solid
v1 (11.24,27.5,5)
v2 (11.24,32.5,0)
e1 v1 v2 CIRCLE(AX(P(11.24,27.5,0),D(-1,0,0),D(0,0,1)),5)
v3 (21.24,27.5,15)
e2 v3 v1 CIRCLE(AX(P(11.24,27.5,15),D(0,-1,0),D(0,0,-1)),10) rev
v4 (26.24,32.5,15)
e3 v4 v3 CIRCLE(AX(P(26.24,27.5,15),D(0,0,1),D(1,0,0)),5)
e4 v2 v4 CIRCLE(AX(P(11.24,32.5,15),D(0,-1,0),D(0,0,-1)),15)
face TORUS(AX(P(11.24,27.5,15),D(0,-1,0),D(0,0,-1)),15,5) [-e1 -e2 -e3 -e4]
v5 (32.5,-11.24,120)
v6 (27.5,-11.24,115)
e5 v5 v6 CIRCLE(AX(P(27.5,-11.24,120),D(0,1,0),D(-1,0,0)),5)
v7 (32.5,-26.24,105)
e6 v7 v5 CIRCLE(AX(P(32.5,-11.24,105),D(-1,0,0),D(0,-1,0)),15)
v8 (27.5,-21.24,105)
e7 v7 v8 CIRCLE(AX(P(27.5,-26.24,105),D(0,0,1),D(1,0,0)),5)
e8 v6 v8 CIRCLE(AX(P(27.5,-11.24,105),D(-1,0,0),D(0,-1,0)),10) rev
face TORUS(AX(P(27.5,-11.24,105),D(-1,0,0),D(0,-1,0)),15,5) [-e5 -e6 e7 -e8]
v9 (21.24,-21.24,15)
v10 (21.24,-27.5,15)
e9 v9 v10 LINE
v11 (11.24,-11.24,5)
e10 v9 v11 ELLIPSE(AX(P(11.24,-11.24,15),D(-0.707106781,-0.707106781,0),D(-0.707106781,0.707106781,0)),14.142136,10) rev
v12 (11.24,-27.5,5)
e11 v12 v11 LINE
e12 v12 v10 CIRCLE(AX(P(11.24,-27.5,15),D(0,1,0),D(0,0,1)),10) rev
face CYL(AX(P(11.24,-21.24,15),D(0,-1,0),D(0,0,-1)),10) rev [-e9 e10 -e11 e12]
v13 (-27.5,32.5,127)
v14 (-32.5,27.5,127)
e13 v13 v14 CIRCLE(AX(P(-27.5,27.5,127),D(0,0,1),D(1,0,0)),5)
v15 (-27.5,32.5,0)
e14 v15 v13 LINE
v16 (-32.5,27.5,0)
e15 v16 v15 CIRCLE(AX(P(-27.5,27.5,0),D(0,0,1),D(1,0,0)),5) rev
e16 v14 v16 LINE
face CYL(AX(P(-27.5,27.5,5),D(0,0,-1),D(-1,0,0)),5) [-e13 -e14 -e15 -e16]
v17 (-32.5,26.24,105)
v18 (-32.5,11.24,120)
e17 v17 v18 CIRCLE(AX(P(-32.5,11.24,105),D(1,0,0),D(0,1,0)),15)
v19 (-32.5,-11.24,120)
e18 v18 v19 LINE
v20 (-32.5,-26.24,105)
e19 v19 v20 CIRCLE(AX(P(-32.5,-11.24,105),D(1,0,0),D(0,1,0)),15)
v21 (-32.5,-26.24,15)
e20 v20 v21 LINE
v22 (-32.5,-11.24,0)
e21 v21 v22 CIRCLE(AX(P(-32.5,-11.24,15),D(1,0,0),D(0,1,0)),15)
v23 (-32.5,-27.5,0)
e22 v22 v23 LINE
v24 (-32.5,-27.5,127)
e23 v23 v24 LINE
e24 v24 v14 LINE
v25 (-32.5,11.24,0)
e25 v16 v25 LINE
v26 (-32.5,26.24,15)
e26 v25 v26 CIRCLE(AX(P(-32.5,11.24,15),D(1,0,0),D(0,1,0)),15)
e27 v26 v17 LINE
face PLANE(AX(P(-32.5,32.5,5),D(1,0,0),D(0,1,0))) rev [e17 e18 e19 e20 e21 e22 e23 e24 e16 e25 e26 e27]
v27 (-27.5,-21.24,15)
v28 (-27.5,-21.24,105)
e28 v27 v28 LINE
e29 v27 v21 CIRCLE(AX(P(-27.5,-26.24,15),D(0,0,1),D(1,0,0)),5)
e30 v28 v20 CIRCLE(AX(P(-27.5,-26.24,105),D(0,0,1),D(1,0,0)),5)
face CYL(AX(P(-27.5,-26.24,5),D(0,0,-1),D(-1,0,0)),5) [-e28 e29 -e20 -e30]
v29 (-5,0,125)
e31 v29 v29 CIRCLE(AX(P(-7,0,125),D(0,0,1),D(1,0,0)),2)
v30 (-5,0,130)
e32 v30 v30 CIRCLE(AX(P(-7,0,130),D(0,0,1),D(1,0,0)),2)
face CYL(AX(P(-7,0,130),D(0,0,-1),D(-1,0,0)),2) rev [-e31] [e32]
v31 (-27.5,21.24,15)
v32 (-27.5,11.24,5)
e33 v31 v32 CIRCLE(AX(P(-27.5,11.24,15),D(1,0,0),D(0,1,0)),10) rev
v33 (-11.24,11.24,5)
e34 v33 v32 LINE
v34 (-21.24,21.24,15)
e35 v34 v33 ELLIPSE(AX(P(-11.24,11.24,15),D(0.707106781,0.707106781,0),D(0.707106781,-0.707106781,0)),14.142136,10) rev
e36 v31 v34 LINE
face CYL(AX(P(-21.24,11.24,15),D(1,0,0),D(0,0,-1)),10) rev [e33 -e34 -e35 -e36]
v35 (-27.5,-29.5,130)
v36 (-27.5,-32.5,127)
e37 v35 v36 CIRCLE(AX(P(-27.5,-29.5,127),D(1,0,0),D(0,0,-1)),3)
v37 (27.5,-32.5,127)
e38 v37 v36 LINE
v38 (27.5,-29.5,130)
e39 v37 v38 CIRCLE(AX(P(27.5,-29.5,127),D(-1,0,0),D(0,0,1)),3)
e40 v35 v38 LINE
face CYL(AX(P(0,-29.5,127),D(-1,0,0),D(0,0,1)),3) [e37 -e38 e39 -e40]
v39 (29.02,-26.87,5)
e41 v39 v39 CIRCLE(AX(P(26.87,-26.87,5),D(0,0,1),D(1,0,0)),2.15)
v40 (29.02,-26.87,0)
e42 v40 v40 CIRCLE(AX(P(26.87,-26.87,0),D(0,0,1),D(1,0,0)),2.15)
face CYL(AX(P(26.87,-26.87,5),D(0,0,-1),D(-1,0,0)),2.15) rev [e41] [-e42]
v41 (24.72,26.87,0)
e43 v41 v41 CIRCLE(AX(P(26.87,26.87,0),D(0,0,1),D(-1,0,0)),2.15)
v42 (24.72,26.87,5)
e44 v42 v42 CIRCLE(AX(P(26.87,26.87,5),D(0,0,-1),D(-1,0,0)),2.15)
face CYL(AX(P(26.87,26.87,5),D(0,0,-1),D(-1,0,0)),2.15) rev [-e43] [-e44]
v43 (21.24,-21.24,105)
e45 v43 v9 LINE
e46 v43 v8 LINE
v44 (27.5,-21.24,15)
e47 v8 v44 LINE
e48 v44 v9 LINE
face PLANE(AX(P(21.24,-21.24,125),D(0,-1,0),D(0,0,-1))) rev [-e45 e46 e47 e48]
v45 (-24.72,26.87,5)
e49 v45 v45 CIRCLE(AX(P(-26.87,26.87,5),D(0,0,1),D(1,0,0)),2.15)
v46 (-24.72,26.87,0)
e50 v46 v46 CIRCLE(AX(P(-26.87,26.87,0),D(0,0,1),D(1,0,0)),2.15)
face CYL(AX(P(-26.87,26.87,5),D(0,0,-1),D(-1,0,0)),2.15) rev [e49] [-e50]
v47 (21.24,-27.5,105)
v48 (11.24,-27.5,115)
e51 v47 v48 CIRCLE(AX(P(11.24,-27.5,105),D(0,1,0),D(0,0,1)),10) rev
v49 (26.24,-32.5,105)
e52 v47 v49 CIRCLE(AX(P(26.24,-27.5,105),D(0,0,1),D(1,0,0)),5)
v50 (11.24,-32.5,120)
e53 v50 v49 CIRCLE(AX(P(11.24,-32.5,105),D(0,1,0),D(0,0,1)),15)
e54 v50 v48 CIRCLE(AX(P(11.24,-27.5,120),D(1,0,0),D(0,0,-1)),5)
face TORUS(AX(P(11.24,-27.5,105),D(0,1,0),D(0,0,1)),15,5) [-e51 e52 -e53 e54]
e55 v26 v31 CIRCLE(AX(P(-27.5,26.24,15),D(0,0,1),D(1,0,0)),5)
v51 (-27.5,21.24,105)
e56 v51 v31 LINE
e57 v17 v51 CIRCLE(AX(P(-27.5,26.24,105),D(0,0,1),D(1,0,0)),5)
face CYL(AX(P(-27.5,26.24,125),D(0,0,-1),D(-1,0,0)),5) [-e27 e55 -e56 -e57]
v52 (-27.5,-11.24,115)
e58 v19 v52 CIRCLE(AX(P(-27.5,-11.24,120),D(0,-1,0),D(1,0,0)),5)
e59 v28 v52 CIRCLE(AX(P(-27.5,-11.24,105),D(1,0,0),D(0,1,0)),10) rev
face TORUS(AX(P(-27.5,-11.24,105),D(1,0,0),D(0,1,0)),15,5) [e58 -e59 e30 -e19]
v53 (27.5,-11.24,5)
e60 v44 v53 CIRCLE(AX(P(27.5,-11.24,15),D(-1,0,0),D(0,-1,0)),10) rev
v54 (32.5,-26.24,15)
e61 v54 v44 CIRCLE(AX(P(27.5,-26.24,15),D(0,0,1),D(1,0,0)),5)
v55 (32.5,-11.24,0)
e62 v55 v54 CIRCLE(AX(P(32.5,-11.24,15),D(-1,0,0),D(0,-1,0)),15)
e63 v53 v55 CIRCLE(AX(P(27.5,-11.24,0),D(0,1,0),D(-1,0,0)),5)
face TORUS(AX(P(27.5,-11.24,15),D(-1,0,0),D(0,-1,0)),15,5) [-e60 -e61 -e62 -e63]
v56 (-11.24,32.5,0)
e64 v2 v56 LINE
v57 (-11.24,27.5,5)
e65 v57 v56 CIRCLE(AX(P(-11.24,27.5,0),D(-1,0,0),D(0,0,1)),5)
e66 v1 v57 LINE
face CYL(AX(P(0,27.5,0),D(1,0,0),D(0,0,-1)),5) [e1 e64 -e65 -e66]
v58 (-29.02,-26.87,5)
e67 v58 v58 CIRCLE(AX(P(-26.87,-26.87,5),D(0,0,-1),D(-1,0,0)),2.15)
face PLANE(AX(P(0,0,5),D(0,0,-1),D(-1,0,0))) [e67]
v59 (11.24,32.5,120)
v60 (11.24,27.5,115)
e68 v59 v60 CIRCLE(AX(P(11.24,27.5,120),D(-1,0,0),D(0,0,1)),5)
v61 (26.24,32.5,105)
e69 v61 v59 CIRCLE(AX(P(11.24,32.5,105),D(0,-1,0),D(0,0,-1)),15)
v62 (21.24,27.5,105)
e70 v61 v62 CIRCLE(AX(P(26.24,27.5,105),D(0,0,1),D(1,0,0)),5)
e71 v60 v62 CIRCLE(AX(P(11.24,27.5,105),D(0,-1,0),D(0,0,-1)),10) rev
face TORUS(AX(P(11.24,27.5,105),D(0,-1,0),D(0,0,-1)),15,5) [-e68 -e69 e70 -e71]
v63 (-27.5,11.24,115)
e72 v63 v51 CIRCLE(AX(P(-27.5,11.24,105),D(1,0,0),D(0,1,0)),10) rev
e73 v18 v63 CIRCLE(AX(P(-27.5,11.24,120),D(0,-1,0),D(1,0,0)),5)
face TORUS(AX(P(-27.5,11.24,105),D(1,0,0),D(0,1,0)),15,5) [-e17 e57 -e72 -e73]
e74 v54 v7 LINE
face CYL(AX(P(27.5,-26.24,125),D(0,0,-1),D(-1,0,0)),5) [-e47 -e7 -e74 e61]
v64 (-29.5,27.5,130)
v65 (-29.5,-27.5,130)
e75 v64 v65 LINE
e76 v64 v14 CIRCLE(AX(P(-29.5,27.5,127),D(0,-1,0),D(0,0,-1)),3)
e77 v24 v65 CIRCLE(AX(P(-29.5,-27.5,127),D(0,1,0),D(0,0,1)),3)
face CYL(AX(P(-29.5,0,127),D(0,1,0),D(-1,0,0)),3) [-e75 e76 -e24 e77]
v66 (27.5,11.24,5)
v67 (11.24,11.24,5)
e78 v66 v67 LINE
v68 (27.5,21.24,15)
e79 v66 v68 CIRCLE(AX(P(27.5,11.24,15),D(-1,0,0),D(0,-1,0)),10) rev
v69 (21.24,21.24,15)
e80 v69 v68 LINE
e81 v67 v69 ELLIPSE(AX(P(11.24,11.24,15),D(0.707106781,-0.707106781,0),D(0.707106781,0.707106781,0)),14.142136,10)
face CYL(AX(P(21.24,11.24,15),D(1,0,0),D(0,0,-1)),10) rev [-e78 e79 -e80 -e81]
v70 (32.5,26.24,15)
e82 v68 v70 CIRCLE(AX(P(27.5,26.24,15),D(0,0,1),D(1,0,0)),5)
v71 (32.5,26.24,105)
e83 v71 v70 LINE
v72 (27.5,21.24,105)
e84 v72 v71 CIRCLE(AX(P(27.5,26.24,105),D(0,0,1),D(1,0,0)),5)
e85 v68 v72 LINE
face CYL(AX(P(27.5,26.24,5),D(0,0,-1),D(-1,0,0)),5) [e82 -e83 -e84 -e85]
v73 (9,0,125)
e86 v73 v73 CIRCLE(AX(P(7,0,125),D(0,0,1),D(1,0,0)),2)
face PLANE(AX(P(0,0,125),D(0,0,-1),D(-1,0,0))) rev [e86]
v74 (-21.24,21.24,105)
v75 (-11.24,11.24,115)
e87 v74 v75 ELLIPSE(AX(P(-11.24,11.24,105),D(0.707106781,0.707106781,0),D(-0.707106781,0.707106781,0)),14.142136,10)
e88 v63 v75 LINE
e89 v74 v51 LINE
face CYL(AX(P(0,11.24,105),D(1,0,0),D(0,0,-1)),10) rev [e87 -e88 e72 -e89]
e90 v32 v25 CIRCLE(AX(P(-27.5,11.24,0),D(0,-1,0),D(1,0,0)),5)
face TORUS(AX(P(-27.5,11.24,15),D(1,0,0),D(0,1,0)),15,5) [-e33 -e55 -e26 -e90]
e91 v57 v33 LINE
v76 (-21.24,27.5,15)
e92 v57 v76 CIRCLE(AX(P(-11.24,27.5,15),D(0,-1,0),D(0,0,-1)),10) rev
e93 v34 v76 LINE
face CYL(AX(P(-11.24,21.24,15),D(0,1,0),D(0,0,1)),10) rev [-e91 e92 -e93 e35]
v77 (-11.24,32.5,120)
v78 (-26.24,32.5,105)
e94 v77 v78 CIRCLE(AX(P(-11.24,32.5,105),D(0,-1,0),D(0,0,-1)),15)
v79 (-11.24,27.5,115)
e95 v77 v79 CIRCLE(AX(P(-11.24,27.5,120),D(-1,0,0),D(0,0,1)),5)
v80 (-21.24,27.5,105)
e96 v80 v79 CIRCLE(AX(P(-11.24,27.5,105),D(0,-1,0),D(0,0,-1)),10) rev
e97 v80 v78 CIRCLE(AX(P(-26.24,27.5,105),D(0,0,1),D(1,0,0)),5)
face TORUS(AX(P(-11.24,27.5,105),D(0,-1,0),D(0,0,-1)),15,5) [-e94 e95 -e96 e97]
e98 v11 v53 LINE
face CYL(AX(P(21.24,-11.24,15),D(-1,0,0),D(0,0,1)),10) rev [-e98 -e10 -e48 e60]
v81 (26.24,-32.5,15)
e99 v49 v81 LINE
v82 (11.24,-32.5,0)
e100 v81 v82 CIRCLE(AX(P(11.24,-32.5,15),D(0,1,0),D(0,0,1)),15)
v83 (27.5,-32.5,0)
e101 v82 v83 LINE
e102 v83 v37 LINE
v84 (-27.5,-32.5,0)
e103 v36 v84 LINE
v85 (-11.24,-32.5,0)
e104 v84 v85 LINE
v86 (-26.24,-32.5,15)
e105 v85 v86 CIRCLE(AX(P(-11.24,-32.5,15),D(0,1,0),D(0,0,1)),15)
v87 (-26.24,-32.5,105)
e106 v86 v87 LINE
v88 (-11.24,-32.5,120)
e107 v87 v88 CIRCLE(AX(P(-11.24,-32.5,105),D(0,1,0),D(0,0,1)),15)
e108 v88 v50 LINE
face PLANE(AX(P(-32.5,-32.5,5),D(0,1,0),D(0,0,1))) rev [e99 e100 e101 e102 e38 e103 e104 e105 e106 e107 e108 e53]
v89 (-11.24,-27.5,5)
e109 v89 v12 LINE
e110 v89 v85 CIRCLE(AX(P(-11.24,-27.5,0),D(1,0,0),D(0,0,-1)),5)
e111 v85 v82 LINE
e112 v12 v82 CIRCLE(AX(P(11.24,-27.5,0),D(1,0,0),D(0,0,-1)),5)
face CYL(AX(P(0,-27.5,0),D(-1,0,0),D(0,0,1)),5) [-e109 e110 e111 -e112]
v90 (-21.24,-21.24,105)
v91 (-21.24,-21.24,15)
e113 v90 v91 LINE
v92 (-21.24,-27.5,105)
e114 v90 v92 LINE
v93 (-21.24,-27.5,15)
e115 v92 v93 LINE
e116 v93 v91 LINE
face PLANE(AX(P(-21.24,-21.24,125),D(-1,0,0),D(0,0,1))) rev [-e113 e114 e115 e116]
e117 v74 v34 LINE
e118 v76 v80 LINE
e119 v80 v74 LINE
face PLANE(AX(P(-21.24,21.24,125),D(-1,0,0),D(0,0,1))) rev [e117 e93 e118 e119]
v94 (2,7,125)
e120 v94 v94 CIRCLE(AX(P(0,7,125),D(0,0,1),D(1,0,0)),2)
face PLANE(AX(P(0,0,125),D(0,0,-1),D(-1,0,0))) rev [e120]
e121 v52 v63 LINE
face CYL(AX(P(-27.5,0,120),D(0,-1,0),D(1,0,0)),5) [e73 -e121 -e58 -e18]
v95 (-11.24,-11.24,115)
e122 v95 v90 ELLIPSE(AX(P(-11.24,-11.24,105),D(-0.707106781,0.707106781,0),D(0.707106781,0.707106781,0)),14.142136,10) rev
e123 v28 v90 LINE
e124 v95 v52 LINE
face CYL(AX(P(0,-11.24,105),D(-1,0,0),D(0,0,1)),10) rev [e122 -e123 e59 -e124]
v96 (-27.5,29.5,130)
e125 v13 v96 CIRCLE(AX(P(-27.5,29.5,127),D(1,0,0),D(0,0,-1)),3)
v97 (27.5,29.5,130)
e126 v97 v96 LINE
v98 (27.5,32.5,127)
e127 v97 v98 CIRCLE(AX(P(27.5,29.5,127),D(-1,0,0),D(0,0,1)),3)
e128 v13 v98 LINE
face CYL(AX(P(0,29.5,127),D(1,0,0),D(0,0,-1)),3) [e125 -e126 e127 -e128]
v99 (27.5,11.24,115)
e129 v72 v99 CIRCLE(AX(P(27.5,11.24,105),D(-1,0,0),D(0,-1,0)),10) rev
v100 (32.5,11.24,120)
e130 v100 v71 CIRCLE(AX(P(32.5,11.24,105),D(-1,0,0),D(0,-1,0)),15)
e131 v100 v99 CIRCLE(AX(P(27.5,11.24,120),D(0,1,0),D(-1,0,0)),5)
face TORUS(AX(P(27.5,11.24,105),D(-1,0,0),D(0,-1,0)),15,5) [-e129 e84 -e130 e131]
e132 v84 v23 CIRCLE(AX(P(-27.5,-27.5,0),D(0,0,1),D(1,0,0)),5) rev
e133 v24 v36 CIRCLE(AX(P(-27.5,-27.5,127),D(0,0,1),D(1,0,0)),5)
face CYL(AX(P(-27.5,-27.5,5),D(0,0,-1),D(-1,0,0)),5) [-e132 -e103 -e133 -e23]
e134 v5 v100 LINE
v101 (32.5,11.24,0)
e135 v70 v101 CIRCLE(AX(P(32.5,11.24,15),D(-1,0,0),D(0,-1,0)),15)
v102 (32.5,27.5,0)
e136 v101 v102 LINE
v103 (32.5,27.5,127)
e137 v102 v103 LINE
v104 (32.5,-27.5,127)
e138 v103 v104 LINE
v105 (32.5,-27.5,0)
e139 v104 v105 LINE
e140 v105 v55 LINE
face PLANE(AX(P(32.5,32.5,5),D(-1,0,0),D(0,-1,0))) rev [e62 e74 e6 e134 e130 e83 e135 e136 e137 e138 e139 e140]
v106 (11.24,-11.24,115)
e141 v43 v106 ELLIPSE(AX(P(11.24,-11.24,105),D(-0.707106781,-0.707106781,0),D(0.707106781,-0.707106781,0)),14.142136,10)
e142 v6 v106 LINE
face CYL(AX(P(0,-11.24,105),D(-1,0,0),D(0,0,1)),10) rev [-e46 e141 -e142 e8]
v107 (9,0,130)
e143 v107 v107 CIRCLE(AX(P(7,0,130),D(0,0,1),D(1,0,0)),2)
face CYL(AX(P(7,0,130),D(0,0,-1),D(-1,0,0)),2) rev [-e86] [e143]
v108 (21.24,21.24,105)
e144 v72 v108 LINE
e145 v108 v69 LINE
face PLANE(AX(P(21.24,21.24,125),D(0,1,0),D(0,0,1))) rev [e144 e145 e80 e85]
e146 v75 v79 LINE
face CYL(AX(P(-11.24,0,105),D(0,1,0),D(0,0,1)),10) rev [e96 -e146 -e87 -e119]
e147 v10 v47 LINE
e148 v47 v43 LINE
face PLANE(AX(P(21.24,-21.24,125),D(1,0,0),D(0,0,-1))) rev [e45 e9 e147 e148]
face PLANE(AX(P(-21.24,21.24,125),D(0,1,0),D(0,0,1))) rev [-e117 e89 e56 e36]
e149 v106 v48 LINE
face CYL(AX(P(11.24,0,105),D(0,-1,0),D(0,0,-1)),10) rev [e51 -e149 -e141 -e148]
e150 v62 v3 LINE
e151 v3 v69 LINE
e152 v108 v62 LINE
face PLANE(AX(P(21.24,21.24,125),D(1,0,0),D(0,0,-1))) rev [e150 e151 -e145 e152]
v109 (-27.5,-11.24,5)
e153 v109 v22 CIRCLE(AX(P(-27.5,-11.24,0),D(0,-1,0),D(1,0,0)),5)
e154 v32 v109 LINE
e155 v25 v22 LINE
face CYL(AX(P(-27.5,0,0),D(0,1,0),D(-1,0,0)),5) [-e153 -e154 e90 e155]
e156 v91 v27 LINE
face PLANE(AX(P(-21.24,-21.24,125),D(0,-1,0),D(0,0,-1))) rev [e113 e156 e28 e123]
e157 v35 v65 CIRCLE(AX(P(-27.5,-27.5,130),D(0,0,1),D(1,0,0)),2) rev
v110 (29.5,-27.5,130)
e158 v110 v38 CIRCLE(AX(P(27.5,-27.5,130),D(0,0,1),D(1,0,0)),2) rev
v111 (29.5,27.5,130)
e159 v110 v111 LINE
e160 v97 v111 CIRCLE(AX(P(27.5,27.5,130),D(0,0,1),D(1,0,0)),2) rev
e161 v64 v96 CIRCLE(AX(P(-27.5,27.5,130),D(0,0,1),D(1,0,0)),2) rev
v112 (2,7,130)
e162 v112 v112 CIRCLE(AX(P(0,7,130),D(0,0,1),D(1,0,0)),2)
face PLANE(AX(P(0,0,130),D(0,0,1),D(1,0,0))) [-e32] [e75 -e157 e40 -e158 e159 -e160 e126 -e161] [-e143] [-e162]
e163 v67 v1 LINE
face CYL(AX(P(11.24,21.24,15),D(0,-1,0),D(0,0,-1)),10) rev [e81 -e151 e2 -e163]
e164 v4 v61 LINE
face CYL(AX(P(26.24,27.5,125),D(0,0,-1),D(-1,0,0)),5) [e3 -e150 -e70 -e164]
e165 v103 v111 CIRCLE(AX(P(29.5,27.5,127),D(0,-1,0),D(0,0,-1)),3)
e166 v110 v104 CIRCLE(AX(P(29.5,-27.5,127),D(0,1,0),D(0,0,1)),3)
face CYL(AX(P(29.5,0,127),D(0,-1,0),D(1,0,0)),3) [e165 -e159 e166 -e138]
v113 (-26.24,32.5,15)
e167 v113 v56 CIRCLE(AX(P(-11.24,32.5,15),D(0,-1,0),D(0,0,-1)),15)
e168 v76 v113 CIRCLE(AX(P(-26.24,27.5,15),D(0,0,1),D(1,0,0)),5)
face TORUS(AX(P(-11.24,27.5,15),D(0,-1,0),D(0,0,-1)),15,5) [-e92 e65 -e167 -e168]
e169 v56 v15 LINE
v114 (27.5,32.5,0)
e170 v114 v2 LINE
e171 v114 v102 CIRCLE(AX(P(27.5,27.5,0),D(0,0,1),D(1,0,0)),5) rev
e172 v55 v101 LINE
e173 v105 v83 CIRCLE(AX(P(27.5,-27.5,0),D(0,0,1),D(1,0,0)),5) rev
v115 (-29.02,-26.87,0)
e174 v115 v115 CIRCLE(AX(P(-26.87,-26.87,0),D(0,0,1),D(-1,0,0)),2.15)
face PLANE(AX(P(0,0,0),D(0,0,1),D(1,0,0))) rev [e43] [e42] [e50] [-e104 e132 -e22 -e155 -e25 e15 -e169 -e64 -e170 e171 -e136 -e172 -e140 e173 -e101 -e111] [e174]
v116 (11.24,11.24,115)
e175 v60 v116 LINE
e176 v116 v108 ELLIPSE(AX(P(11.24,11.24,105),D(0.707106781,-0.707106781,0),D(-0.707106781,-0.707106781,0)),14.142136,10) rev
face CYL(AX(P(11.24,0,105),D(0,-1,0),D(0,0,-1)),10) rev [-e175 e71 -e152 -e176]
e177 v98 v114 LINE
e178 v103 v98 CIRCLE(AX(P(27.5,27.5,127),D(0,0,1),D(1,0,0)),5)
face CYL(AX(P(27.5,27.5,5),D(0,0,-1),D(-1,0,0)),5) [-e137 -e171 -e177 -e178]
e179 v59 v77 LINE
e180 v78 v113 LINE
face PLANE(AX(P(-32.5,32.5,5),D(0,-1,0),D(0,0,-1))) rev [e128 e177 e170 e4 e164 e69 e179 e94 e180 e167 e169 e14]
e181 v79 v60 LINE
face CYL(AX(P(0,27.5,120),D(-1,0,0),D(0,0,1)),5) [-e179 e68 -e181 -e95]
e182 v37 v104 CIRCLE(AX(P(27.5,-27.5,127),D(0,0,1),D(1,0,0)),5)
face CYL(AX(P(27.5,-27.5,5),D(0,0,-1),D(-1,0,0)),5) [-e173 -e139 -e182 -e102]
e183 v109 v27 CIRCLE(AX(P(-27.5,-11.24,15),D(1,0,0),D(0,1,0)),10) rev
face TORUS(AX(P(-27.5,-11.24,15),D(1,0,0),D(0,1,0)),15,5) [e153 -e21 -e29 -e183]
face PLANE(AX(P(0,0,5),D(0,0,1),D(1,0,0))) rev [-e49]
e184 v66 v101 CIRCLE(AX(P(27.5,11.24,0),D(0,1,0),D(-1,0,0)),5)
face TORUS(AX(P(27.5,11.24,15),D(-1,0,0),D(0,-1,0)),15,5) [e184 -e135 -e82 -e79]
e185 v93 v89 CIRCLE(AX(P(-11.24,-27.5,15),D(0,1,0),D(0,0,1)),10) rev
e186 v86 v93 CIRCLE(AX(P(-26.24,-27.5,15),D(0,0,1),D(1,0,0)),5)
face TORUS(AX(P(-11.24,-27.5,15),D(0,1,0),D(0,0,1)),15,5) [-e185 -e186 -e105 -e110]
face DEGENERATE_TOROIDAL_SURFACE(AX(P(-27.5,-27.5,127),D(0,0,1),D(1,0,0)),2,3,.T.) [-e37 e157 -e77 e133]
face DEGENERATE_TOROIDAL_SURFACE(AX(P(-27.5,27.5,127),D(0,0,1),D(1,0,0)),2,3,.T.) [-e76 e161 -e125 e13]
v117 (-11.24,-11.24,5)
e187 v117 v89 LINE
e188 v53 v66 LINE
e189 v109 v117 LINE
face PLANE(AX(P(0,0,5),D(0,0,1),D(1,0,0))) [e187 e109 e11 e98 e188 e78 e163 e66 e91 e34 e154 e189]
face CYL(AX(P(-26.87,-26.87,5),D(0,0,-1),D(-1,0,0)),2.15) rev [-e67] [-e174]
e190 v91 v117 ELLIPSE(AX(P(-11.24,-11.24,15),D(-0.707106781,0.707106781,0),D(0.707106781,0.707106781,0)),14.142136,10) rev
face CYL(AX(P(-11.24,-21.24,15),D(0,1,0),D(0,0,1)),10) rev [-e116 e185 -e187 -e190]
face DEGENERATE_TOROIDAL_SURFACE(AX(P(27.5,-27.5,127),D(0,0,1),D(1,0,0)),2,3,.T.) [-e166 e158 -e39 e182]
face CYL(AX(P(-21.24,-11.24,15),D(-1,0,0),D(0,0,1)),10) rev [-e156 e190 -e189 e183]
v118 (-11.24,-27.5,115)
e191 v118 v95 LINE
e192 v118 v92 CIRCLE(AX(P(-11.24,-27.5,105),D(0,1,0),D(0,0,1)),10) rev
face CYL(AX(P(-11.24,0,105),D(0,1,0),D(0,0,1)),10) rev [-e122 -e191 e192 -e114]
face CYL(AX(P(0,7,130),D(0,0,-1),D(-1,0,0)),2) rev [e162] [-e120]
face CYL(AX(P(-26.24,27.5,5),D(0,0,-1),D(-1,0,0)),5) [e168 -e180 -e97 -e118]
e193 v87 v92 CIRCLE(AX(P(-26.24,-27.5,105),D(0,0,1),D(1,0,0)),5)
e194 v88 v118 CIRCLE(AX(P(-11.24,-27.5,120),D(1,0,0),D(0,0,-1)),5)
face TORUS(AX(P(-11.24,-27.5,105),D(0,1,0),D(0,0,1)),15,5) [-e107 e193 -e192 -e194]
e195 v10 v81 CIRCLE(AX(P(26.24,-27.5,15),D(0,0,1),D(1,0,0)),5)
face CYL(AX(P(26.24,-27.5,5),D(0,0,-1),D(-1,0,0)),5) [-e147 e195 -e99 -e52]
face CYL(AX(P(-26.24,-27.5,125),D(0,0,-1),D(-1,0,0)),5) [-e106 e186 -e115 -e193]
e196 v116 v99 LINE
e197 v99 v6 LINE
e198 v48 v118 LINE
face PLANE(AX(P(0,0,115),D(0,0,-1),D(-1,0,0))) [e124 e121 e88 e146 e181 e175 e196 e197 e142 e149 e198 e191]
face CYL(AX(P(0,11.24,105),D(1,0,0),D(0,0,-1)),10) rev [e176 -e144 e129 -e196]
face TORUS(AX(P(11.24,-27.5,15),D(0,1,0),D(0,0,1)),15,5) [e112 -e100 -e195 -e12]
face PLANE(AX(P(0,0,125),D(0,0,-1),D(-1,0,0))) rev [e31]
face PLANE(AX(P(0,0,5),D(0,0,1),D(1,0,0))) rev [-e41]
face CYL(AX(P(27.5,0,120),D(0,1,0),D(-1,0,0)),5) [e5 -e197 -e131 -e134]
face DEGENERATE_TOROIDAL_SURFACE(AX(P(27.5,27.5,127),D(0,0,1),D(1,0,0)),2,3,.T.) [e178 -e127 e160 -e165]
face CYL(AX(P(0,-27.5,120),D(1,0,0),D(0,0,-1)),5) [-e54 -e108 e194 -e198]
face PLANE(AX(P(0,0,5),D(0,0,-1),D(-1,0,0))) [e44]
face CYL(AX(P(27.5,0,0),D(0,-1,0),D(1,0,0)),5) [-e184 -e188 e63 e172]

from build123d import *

# Parameters (mm, degrees)
SKETCH_1_W      = 65
SKETCH_1_H      = 65
SKETCH_1_R      = 2.15
EXTRUDE_1_DEPTH = 5
SKETCH_3_W      = 11.26
SKETCH_3_H      = 11.26
EXTRUDE_2_DEPTH = 120
SKETCH_4_W      = 65
SKETCH_4_H      = 65
SKETCH_4_R      = 2
EXTRUDE_3_DEPTH = 5
FILLET_1_R      = 10
FILLET_5_R      = 3
EXTRUDE_4_DEPTH = 10
FILLET_6_R      = 10
FILLET_8_R      = 5
FILLET_9_R      = 5
FILLET_10_R     = 5
FILLET_11_R     = 5
FILLET_12_R     = 5


# Some blends are built 0.0001 mm under size
with BuildPart() as part:
    # 草图1 → 凸台-拉伸1 (new body)
    with BuildSketch(Plane.XY):
        Rectangle(SKETCH_1_W, SKETCH_1_H)
        with Locations((-26.87, 26.87)):
            Circle(SKETCH_1_R, mode=Mode.SUBTRACT)
        with Locations(Location((26.87, 26.87, 0), (0, 0, 180))):
            Circle(SKETCH_1_R, mode=Mode.SUBTRACT)
        with Locations((26.87, -26.87)):
            Circle(SKETCH_1_R, mode=Mode.SUBTRACT)
        with Locations(Location((-26.87, -26.87, 0), (0, 0, 180))):
            Circle(SKETCH_1_R, mode=Mode.SUBTRACT)
    extrude(amount=EXTRUDE_1_DEPTH)

    # 草图3 → 凸台-拉伸2 (add)
    with BuildSketch(Plane.XY.offset(5)):
        with Locations((-26.87, 26.87)):
            Rectangle(SKETCH_3_W, SKETCH_3_H)
        with Locations((26.87, 26.87)):
            Rectangle(SKETCH_3_W, SKETCH_3_H)
        with Locations((26.87, -26.87)):
            Rectangle(SKETCH_3_W, SKETCH_3_H)
        with Locations((-26.87, -26.87)):
            Rectangle(SKETCH_3_W, SKETCH_3_H)
    extrude(amount=EXTRUDE_2_DEPTH)

    # 草图4 → 凸台-拉伸3 (add)
    with BuildSketch(Plane.XY.offset(125)):
        Rectangle(SKETCH_4_W, SKETCH_4_H)
        with Locations((0, 7)):
            Circle(SKETCH_4_R, mode=Mode.SUBTRACT)
        with Locations((7, 0)):
            Circle(SKETCH_4_R, mode=Mode.SUBTRACT)
        with Locations((-7, 0)):
            Circle(SKETCH_4_R, mode=Mode.SUBTRACT)
    extrude(amount=EXTRUDE_3_DEPTH)

    # 圆角1
    fillet_1_edges = [part.edges().sort_by_distance(p)[0] for p in [
        (-26.87, 21.24, 5),
        (-21.24, 26.87, 5),
        (21.24, 26.87, 5),
        (26.87, 21.24, 5),
        (21.24, -26.87, 5),
        (26.87, -21.24, 5),
        (-21.24, -26.87, 5),
        (-26.87, -21.24, 5),
    ]]
    fillet(fillet_1_edges, radius=FILLET_1_R)

    # 圆角5
    fillet_5_edges = [part.edges().sort_by_distance(p)[0] for p in [
        (-32.5, 0, 130),
        (0, -32.5, 130),
        (32.5, 0, 130),
        (0, 32.5, 130),
    ]]
    fillet(fillet_5_edges, radius=FILLET_5_R)

    # 草图6 → 凸台-拉伸4 (add)
    with BuildSketch(Plane(origin=(0, 0, 125), x_dir=(-1, 0, 0), z_dir=(0, 0, -1))):
        Polygon((32.5, 21.24), (21.24, 21.24), (21.24, 32.5), (-21.24, 32.5), (-21.24, 21.24), (-32.5, 21.24), (-32.5, -21.24), (-21.24, -21.24), (-21.24, -32.5), (21.24, -32.5), (21.24, -21.24), (32.5, -21.24), align=None)
    extrude(amount=EXTRUDE_4_DEPTH)

    # 圆角6
    fillet_6_edges = [part.edges().sort_by_distance(p)[0] for p in [
        (-26.87, 21.24, 115),
        (-21.24, 26.87, 115),
        (21.24, 26.87, 115),
        (26.87, 21.24, 115),
        (26.87, -21.24, 115),
        (21.24, -26.87, 115),
        (-21.24, -26.87, 115),
        (-26.87, -21.24, 115),
    ]]
    fillet(fillet_6_edges, radius=FILLET_6_R)

    # 圆角8
    fillet_8_edges = [part.edges().sort_by_distance(p)[0] for p in [
        (0, 32.5, 5),
        (-18.311067812, 32.5, 7.928932188),
        (18.311067812, 32.5, 7.928932188),
        (0, 32.5, 115),
        (-21.24, 32.5, 60),
        (21.24, 32.5, 60),
        (-18.311067812, 32.5, 112.071067812),
        (18.311067812, 32.5, 112.071067812),
    ]]
    fillet(fillet_8_edges, radius=FILLET_8_R - 0.0001)  # a hair under: the kernel refuses the full size

    # 圆角9
    fillet_9_edges = [part.edges().sort_by_distance(p)[0] for p in [
        (32.5, 0, 5),
        (32.5, 18.311067812, 7.928932188),
        (32.5, -18.311067812, 7.928932188),
        (32.5, 0, 115),
        (32.5, -21.24, 60),
        (32.5, 21.24, 60),
        (32.5, -18.311067812, 112.071067812),
        (32.5, 18.311067812, 112.071067812),
    ]]
    fillet(fillet_9_edges, radius=FILLET_9_R - 0.0001)  # a hair under: the kernel refuses the full size

    # 圆角10
    fillet_10_edges = [part.edges().sort_by_distance(p)[0] for p in [
        (0, -32.5, 5),
        (-18.311067812, -32.5, 7.928932188),
        (18.311067812, -32.5, 7.928932188),
        (0, -32.5, 115),
        (-21.24, -32.5, 60),
        (21.24, -32.5, 60),
        (-18.311067812, -32.5, 112.071067812),
        (18.311067812, -32.5, 112.071067812),
    ]]
    fillet(fillet_10_edges, radius=FILLET_10_R - 0.0001)  # a hair under: the kernel refuses the full size

    # 圆角11
    fillet_11_edges = [part.edges().sort_by_distance(p)[0] for p in [
        (-32.5, 0, 5),
        (-32.5, -18.311067812, 7.928932188),
        (-32.5, 18.311067812, 7.928932188),
        (-32.5, 0, 115),
        (-32.5, -21.24, 60),
        (-32.5, 21.24, 60),
        (-32.5, -18.311067812, 112.071067812),
        (-32.5, 18.311067812, 112.071067812),
    ]]
    fillet(fillet_11_edges, radius=FILLET_11_R - 0.0001)  # a hair under: the kernel refuses the full size

    # 圆角12
    # the kernel refuses this fillet: 5 mm, written as the material it takes off along each edge
    with BuildSketch(Plane(origin=(-27.5, -27.5, 130), x_dir=(-1, 0, 0), z_dir=(0, 1, 0))) as fillet_12_piece_1:
        with BuildLine():
            CenterArc((2, -3), 3, 0, 90)
            Line((5, -3), (5, 0))
            Line((5, 0), (2, 0))
        make_face()
    revolve(axis=Axis((-27.5, -27.5, 130), (0, 0, 1)), revolution_arc=90, mode=Mode.SUBTRACT)
    with BuildSketch(Plane(origin=(-27.5, 27.5, 130), x_dir=(0, 1, 0), z_dir=(1, 0, 0))) as fillet_12_piece_2:
        with BuildLine():
            CenterArc((2, -3), 3, 0, 90)
            Line((5, -3), (5, 0))
            Line((5, 0), (2, 0))
        make_face()
    revolve(axis=Axis((-27.5, 27.5, 130), (0, 0, 1)), revolution_arc=90, mode=Mode.SUBTRACT)
    with BuildSketch(Plane(origin=(27.5, -27.5, 130), x_dir=(0, -1, 0), z_dir=(-1, 0, 0))) as fillet_12_piece_3:
        with BuildLine():
            CenterArc((2, -3), 3, 0, 90)
            Line((5, -3), (5, 0))
            Line((5, 0), (2, 0))
        make_face()
    revolve(axis=Axis((27.5, -27.5, 130), (0, 0, 1)), revolution_arc=90, mode=Mode.SUBTRACT)
    with BuildSketch(Plane(origin=(27.5, 27.5, 130), x_dir=(1, 0, 0), z_dir=(0, -1, 0))) as fillet_12_piece_4:
        with BuildLine():
            CenterArc((2, -3), 3, 0, 90)
            Line((5, -3), (5, 0))
            Line((5, 0), (2, 0))
        make_face()
    revolve(axis=Axis((27.5, 27.5, 130), (0, 0, 1)), revolution_arc=90, mode=Mode.SUBTRACT)
    with BuildSketch(Plane(origin=(32.5, 32.5, 130), x_dir=(-1, 0, 0), z_dir=(0, 0, -1)), Plane(origin=(-32.5, -32.5, -12.5), x_dir=(0, 1, 0), z_dir=(0, 0, 1))) as fillet_12_piece_5:
        with BuildLine():
            CenterArc((FILLET_12_R, -FILLET_12_R), FILLET_12_R, 90, 90)
            Line((0, -FILLET_12_R), (0, 0))
            Line((0, 0), (FILLET_12_R, 0))
        make_face()
    extrude(amount=142.5, mode=Mode.SUBTRACT)
    with BuildSketch(Plane(origin=(32.5, -32.5, 130), x_dir=(-1, 0, 0), z_dir=(0, 0, -1)), Plane(origin=(-32.5, 32.5, -12.5), x_dir=(0, -1, 0), z_dir=(0, 0, 1))) as fillet_12_piece_6:
        with BuildLine():
            CenterArc((FILLET_12_R, FILLET_12_R), FILLET_12_R, 180, 90)
            Line((0, FILLET_12_R), (0, 0))
            Line((0, 0), (FILLET_12_R, 0))
        make_face()
    extrude(amount=142.5, mode=Mode.SUBTRACT)


solid = part.part
